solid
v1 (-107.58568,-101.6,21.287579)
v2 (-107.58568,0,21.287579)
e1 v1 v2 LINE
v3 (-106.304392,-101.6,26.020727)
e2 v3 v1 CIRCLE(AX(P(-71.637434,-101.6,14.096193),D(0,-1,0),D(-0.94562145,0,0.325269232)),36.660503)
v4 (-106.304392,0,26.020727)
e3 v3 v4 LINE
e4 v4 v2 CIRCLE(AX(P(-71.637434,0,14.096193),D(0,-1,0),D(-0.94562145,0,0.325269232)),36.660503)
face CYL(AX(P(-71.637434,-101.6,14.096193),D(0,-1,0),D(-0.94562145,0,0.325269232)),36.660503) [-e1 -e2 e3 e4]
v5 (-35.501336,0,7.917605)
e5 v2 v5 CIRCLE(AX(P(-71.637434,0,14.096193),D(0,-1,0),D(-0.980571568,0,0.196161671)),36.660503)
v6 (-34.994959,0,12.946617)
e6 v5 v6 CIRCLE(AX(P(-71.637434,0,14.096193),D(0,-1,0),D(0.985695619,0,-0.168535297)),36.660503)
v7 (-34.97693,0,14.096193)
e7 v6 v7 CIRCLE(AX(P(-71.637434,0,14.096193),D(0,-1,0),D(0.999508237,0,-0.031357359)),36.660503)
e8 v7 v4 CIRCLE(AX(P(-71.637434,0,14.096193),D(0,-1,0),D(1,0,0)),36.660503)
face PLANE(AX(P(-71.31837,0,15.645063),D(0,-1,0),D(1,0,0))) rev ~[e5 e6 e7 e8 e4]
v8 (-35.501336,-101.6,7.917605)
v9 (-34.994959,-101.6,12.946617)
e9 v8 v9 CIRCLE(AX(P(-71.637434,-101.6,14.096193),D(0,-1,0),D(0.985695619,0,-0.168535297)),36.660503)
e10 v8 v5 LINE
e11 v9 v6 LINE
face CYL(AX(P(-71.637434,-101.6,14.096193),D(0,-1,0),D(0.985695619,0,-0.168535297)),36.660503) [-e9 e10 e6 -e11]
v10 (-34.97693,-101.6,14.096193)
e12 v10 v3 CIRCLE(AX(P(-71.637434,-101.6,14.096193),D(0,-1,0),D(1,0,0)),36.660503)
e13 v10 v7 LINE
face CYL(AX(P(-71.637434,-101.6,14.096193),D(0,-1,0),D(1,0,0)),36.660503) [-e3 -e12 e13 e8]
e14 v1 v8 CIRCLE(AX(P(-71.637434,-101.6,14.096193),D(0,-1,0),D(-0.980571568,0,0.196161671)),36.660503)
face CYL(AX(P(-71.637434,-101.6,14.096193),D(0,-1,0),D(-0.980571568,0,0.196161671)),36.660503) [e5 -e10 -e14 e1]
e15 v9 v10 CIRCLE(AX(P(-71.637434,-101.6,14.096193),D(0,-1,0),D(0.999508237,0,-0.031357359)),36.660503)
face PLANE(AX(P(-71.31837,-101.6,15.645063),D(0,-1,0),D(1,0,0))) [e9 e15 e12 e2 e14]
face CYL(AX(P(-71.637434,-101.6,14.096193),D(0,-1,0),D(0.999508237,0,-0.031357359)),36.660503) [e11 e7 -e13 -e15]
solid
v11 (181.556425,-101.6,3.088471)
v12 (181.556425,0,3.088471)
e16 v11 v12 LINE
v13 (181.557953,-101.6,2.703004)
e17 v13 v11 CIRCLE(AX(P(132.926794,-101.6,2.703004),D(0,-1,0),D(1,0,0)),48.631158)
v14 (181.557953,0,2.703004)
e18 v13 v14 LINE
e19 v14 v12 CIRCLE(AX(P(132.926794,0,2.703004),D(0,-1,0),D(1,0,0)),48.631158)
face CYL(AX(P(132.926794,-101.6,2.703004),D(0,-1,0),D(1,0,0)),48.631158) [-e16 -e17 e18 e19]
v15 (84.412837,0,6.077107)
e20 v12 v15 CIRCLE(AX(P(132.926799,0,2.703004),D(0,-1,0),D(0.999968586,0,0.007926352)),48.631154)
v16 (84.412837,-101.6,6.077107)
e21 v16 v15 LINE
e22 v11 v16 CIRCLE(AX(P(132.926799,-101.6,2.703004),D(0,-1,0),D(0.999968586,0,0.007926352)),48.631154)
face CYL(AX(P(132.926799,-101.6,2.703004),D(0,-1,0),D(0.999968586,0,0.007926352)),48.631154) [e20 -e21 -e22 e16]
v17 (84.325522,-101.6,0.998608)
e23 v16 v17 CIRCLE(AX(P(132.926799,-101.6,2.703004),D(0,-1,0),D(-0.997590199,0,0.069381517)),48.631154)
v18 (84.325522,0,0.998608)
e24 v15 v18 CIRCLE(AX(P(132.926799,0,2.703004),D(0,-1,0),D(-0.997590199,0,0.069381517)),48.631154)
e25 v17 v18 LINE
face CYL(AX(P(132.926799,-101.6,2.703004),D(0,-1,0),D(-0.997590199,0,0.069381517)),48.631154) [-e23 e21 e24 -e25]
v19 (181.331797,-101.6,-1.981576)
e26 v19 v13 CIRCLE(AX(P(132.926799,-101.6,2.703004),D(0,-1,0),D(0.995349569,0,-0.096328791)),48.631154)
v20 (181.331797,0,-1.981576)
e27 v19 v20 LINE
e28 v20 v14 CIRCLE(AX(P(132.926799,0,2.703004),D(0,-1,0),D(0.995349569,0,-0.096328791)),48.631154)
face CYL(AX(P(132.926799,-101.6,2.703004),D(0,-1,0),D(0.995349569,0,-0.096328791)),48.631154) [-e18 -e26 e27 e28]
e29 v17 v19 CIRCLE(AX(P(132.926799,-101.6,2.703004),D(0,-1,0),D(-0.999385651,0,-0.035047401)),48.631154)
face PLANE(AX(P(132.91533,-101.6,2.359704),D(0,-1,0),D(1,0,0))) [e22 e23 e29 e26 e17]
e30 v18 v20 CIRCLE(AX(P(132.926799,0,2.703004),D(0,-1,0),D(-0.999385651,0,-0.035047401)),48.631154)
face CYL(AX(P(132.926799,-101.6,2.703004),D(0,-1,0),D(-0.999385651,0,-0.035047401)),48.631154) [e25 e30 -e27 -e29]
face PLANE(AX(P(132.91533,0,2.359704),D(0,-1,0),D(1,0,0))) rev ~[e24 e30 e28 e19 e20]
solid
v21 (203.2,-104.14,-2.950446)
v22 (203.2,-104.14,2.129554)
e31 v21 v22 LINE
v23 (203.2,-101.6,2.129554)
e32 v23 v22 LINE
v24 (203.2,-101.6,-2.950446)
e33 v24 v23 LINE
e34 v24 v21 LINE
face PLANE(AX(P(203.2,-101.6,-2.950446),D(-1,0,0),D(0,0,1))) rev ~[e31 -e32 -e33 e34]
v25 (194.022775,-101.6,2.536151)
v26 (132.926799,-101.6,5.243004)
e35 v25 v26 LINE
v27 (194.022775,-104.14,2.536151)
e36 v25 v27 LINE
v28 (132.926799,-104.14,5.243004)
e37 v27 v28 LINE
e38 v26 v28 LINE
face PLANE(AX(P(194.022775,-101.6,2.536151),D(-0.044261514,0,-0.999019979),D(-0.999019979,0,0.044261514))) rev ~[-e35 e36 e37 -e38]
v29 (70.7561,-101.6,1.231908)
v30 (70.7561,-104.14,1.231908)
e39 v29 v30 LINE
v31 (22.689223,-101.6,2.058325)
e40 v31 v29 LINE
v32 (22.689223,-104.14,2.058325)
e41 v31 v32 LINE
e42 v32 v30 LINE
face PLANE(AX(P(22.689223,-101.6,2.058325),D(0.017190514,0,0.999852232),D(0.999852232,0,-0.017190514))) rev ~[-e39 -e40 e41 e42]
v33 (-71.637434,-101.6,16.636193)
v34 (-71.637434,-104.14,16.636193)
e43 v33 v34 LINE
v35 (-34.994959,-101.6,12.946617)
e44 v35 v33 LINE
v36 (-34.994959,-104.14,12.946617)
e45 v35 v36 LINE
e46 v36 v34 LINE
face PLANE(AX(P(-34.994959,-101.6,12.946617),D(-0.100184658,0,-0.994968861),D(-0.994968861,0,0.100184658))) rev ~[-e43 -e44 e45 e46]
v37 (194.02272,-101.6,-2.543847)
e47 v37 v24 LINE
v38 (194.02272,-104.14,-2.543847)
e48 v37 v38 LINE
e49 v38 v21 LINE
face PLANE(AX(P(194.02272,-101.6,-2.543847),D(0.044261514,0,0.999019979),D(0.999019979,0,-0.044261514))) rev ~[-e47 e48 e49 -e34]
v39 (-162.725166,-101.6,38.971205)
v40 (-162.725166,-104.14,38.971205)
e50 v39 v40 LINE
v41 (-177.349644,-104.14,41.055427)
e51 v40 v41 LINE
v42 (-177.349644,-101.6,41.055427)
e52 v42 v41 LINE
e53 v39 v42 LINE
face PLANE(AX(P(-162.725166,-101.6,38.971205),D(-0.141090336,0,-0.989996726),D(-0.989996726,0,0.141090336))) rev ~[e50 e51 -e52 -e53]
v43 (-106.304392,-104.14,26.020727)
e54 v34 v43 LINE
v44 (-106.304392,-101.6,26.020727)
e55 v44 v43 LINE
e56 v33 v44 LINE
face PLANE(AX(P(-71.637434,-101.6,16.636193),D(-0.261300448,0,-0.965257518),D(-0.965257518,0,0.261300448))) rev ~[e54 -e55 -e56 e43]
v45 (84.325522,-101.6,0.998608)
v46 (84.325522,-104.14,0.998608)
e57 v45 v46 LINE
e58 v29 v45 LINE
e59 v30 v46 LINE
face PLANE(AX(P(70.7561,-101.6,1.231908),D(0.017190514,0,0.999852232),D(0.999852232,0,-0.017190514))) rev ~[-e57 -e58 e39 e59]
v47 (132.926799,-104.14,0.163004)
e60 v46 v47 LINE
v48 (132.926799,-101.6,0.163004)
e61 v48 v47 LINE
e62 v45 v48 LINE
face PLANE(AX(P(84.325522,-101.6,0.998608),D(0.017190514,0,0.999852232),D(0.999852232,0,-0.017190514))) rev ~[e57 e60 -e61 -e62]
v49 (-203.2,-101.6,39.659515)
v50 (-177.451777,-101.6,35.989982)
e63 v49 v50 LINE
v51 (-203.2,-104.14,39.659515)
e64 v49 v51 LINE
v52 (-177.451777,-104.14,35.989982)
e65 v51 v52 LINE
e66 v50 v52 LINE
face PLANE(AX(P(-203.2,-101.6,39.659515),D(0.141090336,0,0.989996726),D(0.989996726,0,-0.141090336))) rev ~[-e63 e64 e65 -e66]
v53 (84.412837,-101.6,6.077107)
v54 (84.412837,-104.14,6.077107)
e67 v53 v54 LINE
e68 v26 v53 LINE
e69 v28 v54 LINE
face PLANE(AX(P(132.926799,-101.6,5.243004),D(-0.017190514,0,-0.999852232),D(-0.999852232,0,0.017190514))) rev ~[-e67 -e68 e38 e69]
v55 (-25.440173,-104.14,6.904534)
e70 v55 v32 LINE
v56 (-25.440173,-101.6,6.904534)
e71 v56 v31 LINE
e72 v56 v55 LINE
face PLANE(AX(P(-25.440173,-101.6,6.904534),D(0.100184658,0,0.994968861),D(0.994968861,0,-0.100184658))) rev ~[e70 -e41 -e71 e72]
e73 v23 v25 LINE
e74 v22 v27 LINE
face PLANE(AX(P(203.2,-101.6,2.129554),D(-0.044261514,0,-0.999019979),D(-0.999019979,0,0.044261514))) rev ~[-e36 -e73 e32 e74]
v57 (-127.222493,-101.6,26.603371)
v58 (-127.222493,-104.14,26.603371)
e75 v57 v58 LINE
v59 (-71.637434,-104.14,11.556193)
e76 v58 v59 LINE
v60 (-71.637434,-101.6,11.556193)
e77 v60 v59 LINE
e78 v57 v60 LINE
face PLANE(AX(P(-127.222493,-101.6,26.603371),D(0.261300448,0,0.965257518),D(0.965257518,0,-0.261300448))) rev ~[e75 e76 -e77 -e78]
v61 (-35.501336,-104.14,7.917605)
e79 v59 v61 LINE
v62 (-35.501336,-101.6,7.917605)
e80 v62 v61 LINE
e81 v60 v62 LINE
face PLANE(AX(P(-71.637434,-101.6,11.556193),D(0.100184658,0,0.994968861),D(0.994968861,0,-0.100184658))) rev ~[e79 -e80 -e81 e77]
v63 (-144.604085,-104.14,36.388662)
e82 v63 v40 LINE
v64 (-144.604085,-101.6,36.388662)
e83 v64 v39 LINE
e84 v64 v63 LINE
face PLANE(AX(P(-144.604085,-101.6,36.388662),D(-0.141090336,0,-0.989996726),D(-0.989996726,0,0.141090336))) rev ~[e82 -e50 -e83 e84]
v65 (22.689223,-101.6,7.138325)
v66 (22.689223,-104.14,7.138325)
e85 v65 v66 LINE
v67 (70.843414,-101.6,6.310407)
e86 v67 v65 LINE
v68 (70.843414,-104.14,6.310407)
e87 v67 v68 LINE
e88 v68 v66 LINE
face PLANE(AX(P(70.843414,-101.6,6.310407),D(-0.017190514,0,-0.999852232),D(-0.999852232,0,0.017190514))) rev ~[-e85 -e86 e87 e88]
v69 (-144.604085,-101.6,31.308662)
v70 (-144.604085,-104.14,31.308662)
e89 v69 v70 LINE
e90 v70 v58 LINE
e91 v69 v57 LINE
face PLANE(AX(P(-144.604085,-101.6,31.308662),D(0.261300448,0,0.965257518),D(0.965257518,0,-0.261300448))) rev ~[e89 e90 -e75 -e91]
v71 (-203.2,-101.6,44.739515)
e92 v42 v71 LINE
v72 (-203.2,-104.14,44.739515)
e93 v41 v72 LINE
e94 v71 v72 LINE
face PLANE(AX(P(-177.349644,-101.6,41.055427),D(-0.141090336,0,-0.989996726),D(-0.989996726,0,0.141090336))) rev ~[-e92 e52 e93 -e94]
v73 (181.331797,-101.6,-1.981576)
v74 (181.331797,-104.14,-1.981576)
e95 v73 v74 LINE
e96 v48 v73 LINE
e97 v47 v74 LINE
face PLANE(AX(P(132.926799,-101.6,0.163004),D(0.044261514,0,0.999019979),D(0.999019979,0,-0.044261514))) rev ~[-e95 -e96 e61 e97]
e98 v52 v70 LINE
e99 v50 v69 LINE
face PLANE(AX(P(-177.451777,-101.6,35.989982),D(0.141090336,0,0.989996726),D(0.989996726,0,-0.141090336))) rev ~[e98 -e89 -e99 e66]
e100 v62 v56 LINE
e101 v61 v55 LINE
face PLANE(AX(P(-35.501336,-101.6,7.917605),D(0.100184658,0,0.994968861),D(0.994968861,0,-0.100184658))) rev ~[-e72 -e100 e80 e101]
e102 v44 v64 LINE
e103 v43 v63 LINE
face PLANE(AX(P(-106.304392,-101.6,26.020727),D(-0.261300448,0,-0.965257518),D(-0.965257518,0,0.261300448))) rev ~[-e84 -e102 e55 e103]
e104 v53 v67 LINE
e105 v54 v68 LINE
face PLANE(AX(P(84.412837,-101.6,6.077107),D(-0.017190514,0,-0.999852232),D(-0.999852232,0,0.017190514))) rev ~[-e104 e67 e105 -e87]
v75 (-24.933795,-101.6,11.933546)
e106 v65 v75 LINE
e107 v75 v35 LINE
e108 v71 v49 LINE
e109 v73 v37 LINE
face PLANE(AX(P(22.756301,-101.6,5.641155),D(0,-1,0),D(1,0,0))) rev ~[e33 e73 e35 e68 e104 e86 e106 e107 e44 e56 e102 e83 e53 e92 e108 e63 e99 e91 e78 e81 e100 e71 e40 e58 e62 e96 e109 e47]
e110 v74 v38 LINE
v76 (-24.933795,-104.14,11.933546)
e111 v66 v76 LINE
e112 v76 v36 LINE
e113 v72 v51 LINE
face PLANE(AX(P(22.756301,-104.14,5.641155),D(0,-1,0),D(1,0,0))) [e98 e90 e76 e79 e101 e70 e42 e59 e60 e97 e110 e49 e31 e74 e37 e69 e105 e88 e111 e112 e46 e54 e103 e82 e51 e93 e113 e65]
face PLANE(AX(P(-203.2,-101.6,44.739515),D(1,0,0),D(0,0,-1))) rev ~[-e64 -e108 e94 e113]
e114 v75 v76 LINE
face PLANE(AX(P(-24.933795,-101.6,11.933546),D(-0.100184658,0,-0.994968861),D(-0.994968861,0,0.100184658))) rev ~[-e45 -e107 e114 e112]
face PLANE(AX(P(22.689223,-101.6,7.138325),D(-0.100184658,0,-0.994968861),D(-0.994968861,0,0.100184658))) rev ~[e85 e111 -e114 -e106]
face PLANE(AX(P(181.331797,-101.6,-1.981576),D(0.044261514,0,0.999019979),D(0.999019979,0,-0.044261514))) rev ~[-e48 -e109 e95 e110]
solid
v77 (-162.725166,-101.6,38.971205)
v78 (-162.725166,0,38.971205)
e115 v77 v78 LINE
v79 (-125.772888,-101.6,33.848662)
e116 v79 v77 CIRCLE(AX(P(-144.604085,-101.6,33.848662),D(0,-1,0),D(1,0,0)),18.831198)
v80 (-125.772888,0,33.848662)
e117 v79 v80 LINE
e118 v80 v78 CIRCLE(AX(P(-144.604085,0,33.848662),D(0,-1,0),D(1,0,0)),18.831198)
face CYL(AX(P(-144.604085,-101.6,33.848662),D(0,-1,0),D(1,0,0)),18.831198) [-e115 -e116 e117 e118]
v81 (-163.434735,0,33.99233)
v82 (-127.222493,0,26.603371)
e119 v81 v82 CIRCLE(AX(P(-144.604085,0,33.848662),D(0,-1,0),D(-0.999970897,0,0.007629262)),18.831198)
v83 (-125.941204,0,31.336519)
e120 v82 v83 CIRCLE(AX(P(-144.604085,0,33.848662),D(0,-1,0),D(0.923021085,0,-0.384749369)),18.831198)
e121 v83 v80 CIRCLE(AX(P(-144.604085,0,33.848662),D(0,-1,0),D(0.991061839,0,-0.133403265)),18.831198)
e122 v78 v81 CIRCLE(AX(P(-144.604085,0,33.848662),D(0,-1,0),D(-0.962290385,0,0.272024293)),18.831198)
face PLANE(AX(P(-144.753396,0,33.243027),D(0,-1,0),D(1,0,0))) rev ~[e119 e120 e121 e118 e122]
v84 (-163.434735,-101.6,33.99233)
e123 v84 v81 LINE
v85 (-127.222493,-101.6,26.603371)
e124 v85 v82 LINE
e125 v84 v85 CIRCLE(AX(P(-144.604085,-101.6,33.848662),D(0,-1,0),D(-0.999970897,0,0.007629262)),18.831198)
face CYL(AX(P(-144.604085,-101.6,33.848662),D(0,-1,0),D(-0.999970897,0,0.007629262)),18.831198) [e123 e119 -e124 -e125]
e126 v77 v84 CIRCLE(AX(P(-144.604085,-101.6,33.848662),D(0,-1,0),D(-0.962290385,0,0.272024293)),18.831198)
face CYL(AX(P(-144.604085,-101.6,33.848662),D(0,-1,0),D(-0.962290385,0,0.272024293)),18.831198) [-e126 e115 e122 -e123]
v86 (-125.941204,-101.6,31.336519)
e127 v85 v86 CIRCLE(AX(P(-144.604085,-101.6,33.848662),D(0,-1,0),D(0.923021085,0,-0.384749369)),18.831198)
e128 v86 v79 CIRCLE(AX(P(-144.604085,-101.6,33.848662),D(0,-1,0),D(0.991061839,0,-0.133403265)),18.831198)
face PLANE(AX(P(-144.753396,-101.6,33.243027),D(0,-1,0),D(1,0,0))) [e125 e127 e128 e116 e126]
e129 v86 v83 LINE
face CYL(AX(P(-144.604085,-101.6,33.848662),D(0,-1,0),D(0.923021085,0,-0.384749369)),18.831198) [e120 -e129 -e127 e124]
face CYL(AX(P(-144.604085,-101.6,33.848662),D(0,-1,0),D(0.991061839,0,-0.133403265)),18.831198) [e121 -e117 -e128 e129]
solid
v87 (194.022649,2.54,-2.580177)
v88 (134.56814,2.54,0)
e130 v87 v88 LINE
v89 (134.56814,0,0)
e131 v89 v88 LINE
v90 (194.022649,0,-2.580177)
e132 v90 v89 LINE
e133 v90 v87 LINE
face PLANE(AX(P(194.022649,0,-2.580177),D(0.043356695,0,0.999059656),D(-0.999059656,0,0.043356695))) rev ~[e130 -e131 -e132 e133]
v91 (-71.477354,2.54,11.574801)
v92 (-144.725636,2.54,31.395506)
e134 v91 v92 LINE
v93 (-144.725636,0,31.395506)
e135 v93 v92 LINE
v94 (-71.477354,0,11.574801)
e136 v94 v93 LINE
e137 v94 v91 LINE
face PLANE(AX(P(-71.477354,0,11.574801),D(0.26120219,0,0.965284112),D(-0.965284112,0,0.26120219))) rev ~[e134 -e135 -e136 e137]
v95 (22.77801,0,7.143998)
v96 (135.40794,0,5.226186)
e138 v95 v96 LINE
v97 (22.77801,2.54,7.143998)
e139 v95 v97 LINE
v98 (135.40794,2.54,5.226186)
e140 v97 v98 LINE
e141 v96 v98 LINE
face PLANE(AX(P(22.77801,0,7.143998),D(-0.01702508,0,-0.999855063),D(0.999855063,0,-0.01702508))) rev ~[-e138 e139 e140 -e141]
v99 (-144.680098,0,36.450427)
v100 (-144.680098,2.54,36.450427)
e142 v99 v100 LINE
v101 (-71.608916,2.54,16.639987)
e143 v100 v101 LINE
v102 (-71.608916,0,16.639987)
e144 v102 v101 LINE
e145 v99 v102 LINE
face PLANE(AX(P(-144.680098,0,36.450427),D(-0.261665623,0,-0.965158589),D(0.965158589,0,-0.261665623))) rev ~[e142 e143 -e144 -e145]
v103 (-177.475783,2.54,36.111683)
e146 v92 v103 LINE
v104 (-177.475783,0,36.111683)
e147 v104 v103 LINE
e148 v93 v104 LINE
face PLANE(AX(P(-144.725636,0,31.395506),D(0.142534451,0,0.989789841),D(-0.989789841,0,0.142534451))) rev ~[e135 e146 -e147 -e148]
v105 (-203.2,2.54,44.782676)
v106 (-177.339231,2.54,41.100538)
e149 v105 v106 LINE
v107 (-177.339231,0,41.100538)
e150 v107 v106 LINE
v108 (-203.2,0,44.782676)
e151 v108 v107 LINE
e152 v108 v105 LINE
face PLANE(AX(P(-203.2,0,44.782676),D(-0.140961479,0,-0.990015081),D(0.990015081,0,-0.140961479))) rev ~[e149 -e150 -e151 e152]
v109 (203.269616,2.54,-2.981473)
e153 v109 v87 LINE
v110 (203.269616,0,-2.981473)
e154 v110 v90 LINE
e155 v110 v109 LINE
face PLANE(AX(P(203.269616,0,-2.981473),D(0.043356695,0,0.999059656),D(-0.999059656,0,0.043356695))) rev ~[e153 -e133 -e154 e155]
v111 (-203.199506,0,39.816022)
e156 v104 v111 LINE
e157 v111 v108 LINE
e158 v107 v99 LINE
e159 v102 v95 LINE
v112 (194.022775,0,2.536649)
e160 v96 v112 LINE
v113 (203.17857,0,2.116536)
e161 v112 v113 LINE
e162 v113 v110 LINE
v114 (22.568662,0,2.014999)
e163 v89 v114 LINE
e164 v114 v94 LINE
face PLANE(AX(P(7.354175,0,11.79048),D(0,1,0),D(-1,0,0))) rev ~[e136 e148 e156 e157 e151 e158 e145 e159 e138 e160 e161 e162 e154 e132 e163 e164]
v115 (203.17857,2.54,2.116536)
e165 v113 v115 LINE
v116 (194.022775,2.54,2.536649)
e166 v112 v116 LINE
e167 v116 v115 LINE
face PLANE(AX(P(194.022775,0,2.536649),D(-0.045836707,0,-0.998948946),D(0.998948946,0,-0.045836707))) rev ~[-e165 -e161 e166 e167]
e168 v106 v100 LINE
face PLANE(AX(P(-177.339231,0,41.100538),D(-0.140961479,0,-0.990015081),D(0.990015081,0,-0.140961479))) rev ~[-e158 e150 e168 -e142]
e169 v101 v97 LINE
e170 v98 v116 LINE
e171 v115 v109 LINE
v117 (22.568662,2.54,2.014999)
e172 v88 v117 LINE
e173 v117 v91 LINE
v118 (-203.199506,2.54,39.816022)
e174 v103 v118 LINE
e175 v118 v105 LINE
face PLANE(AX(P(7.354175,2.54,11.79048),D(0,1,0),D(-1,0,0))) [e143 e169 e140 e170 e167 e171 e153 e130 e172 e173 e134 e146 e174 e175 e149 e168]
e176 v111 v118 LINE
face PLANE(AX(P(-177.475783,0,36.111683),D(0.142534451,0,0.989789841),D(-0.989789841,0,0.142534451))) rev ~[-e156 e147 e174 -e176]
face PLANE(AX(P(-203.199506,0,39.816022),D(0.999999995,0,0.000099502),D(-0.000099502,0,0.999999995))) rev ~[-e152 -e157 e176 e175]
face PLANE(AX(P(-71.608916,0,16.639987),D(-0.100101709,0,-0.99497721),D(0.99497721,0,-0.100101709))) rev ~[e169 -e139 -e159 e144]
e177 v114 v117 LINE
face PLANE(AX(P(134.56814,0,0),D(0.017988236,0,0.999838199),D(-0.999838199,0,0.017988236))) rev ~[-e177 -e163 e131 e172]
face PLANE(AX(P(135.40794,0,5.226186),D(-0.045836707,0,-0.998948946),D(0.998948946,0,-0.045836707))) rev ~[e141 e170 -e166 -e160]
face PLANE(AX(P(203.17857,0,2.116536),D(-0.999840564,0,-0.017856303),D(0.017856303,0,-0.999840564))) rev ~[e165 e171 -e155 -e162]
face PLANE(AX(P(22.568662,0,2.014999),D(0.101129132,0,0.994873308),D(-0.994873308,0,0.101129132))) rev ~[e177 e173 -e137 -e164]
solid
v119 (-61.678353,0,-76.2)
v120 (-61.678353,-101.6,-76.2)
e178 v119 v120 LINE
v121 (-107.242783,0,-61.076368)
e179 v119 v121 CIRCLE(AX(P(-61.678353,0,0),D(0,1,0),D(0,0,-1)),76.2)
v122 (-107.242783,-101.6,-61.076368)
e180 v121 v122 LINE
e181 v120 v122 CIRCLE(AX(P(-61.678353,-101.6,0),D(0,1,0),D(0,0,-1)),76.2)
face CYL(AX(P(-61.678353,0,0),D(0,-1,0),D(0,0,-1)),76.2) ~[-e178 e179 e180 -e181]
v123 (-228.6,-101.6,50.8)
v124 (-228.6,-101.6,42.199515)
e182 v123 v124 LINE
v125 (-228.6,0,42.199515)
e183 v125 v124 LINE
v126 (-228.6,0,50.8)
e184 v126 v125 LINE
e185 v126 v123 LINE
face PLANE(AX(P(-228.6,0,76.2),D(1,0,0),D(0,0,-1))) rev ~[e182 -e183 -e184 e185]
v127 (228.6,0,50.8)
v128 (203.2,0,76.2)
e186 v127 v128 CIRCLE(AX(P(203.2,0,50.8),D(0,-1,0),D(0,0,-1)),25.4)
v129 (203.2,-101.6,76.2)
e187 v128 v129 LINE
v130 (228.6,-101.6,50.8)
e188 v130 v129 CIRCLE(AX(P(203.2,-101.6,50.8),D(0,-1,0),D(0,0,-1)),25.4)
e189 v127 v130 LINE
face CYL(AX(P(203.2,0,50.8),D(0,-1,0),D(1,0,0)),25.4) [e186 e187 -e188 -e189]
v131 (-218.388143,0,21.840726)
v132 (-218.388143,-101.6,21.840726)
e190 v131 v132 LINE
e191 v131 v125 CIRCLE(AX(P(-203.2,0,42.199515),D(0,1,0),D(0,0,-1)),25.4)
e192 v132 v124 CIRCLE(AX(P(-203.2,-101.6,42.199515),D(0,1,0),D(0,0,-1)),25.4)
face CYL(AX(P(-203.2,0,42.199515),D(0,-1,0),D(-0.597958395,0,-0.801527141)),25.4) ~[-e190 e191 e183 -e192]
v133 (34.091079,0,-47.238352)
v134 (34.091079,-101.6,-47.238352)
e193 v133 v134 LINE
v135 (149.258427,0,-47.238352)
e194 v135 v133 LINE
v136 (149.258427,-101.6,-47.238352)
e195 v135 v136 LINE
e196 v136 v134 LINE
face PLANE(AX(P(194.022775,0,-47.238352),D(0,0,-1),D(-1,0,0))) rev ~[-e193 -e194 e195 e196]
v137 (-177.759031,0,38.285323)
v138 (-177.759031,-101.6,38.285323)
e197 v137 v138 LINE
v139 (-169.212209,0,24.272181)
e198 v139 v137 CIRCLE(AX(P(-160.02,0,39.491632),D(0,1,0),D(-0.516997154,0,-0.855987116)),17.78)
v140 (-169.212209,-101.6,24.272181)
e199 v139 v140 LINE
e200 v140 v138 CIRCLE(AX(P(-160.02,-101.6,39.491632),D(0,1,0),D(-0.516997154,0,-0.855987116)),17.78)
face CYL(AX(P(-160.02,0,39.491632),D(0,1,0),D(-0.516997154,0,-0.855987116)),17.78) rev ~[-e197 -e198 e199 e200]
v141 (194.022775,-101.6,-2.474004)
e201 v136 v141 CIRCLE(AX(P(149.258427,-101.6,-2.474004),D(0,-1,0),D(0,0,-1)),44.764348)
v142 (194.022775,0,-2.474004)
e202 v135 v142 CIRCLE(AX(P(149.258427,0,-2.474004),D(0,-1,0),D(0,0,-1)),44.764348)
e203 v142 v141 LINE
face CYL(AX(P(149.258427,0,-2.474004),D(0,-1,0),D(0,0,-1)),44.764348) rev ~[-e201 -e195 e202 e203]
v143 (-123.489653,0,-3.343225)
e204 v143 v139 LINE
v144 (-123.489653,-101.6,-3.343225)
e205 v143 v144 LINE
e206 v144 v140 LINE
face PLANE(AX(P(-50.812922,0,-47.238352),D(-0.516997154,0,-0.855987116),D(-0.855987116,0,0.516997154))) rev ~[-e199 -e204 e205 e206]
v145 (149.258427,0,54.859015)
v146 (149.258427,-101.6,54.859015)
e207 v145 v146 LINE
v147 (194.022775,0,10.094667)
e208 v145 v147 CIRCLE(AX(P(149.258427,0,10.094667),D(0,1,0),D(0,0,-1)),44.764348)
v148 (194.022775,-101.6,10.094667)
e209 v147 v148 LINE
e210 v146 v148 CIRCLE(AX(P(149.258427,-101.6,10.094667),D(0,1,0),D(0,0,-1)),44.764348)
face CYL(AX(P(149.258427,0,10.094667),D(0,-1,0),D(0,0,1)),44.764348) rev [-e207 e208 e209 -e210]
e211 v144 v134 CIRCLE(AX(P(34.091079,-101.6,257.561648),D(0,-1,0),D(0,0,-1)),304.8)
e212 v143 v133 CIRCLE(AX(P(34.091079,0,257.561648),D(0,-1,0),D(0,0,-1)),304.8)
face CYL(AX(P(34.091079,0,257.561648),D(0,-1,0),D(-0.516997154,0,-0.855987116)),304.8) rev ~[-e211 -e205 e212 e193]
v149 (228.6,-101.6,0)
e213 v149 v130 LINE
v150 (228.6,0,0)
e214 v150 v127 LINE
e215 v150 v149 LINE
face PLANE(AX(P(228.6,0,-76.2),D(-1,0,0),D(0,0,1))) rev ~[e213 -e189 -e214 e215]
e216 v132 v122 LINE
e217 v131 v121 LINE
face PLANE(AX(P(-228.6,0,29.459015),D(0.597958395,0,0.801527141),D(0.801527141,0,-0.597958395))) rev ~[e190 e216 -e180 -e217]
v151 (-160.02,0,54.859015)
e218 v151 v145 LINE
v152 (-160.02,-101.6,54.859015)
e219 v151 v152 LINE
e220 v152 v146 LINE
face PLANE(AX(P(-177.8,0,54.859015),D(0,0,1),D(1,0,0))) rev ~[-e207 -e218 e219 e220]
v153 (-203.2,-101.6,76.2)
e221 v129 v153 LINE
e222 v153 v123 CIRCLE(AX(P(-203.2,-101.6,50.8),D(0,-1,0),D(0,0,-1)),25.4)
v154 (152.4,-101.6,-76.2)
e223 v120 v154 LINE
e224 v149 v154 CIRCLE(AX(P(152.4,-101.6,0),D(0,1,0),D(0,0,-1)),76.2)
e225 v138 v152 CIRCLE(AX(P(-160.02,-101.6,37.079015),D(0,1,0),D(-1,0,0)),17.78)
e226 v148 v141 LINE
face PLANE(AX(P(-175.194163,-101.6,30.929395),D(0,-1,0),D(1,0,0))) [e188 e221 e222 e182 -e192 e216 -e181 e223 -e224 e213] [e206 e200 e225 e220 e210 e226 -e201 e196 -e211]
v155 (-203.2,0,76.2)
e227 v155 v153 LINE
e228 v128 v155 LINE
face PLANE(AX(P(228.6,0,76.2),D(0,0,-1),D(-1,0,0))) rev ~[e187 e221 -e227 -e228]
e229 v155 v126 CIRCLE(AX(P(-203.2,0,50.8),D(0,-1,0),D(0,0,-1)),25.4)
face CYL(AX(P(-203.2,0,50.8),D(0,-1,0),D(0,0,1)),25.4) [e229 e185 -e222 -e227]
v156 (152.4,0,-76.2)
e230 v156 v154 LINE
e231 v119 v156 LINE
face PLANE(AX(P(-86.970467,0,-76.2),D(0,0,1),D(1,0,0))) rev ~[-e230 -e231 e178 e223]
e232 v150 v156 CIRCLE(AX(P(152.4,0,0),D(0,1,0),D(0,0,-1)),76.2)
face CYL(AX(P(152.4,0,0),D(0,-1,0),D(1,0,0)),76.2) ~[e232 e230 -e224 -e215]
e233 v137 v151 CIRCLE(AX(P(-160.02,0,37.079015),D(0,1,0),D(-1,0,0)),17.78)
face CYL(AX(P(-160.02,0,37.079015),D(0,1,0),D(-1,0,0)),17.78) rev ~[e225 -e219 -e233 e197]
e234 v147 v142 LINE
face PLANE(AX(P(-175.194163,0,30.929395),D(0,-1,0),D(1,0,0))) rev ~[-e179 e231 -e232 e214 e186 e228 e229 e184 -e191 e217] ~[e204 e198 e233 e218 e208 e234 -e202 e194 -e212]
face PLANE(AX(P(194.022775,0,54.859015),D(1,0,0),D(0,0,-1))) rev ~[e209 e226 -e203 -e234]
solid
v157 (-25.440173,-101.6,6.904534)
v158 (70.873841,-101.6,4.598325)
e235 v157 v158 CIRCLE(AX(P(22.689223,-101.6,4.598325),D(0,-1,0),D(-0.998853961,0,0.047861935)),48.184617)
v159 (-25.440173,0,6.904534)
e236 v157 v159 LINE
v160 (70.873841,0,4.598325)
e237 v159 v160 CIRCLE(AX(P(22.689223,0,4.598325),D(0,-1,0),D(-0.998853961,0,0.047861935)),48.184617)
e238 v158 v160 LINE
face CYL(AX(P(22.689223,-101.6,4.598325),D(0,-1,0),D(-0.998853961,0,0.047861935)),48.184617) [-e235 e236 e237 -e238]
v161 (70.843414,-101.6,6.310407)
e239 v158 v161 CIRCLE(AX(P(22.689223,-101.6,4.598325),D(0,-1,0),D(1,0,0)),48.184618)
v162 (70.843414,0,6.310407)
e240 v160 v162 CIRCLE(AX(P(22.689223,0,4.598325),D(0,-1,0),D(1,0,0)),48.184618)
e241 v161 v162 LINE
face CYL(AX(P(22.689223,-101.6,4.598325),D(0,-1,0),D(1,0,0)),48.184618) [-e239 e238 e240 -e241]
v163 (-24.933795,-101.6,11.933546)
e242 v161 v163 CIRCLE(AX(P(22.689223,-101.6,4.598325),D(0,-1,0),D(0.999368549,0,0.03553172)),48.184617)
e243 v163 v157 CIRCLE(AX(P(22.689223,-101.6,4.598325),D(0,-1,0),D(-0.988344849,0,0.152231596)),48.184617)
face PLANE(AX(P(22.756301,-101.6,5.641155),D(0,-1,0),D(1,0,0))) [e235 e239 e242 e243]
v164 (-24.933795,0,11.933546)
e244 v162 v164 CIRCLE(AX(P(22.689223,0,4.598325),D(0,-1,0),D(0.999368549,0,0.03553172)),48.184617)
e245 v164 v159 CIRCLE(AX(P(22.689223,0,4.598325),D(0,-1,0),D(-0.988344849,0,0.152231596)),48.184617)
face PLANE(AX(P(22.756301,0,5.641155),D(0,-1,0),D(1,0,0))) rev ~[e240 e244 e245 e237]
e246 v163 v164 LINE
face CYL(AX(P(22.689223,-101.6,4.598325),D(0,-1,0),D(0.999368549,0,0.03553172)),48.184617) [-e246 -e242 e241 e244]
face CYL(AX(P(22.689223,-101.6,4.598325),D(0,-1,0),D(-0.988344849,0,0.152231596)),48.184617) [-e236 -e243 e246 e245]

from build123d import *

# Parameters (mm, degrees)
F1_DEPTH    = 101.6
F2_R        = 25.4
F3_R        = 76.2
F4_R        = 25.4
F5_T1_DEPTH = 101.6
F6_R        = 44.7643478735
F7_R        = 304.8
F9_DEPTH    = 101.6
F10_DEPTH   = 2.54
F12_DEPTH   = 2.54


# Not quite as in the source:
# - a fillet or chamfer that OpenCascade refuses, or shapes differently, is made with other operations: its cross-section is extruded or revolved along the edge and cut away or added
# - a feature names something its author has since deleted; it is built from what else it names


with BuildPart() as f1:
    # F0 (on Front) → F1 (new body)
    with BuildSketch(Plane.XZ):
        Polygon((228.6, -76.2), (228.6, 76.2), (-228.6, 76.2), (-228.6, 29.4590149546), (-86.9704671455, -76.2), align=None)
        Polygon((-50.8129218496, -47.2383520842), (-177.8, 29.4590149546), (-177.8, 54.8590149546), (194.0227749825, 54.8590149546), (194.0227749825, -47.2383520842), align=None, mode=Mode.SUBTRACT)
    extrude(amount=F1_DEPTH)

    # F2
    f2_edges = [f1.edges().sort_by_distance(p)[0] for p in [
        (-228.6, -50.8, 76.2),
        (-228.6, -50.8, 29.459015),
    ]]
    fillet(f2_edges, radius=F2_R)

    # F3
    f3_edges = [f1.edges().sort_by_distance(p)[0] for p in [
        (-86.970467, -50.8, -76.2),
        (228.6, -50.8, -76.2),
    ]]
    fillet(f3_edges, radius=F3_R)

    # F4
    f4_edges = [f1.edges().sort_by_distance(p)[0] for p in [
        (228.6, -50.8, 76.2),
    ]]
    fillet(f4_edges, radius=F4_R)

    # F5: fillet of radius 17.78 on 2 edges, made by hand

    # F5_s2 → F5_t1 (join)
    with BuildSketch(Plane.XZ):
        with BuildLine():
            ThreePointArc((-169.2122093999, 24.2721806932), (-175.5049262693, 30.7540427919), (-177.8, 39.4916316146))
            Line((-177.8, 39.4916316146), (-177.8, 29.4590149546))
            Line((-177.8, 29.4590149546), (-169.2122093999, 24.2721806932))
        make_face()
        with BuildLine():
            ThreePointArc((-177.8, 37.0790149546), (-172.5923585695, 49.6513735241), (-160.02, 54.8590149546))
            Line((-160.02, 54.8590149546), (-177.8, 54.8590149546))
            Line((-177.8, 54.8590149546), (-177.8, 37.0790149546))
        make_face()
    extrude(amount=F5_T1_DEPTH)

    # F6
    f6_edges = [f1.edges().sort_by_distance(p)[0] for p in [
        (194.022775, -50.8, -47.238352),
        (194.022775, -50.8, 54.859015),
    ]]
    fillet(f6_edges, radius=F6_R)

    # F7
    f7_edges = [f1.edges().sort_by_distance(p)[0] for p in [
        (-50.812922, -50.8, -47.238352),
    ]]
    fillet(f7_edges, radius=F7_R)


with BuildPart() as f9:
    # F8 (on face) → F9 (new body)
    with BuildSketch(Plane.XZ.offset(101.6)):
        with BuildLine():
            ThreePointArc((181.5579526246, 2.7030038423), (181.5575706981, 2.8957391669), (181.5564249247, 3.0884714642))
            Line((181.5564249247, 3.0884714642), (132.9267988621, 5.2430038423))
            Line((132.9267988621, 5.2430038423), (84.4128365038, 6.0771070674))
            ThreePointArc((84.4128365038, 6.0771070674), (84.3028312187, 3.5389983943), (84.3255215946, 0.9986082775))
            Line((84.3255215946, 0.9986082775), (132.9267988621, 0.1630038423))
            Line((132.9267988621, 0.1630038423), (181.3317967881, -1.981576401))
            ThreePointArc((181.3317967881, -1.981576401), (181.5013807609, 0.3579857976), (181.5579526246, 2.7030038423))
        make_face()
        with BuildLine():
            Line((132.9267988621, 5.2430038423), (181.5564249247, 3.0884714642))
            ThreePointArc((181.5564249247, 3.0884714642), (134.4222353253, 51.3111593931), (84.4128365038, 6.0771070674))
            Line((84.4128365038, 6.0771070674), (132.9267988621, 5.2430038423))
        make_face()
        with BuildLine():
            Line((132.9267988621, 0.1630038423), (84.3255215946, 0.9986082775))
            ThreePointArc((84.3255215946, 0.9986082775), (131.4334782085, -45.9052167557), (181.3317967881, -1.981576401))
            Line((181.3317967881, -1.981576401), (132.9267988621, 0.1630038423))
        make_face()
    extrude(amount=-F9_DEPTH)


with BuildPart() as f9b:
    # F8 (on face) → F9, piece 2 (new body)
    with BuildSketch(Plane.XZ.offset(101.6)):
        with BuildLine():
            ThreePointArc((-24.933795283, 11.9335457727), (-25.2529707533, 9.4256839495), (-25.4401728054, 6.904533558))
            Line((-25.4401728054, 6.904533558), (22.6892231991, 2.0583245484))
            Line((22.6892231991, 2.0583245484), (70.7560995281, 1.231908098))
            ThreePointArc((70.7560995281, 1.231908098), (70.8443963799, 2.9140871326), (70.8738406589, 4.5983245484))
            ThreePointArc((70.8738406589, 4.5983245484), (70.866233503, 5.4545008872), (70.8434144374, 6.3104068879))
            Line((70.8434144374, 6.3104068879), (22.6892231991, 7.1383245484))
            Line((22.6892231991, 7.1383245484), (-24.933795283, 11.9335457727))
        make_face()
        with BuildLine():
            ThreePointArc((70.8434144374, 6.3104068879), (25.5133086889, 52.7001114268), (-24.933795283, 11.9335457727))
            Line((-24.933795283, 11.9335457727), (22.6892231991, 7.1383245484))
            Line((22.6892231991, 7.1383245484), (70.8434144374, 6.3104068879))
        make_face()
        with BuildLine():
            Line((22.6892231991, 2.0583245484), (-25.4401728054, 6.904533558))
            ThreePointArc((-25.4401728054, 6.904533558), (19.8527382123, -43.5027327442), (70.7560995281, 1.231908098))
            Line((70.7560995281, 1.231908098), (22.6892231991, 2.0583245484))
        make_face()
    extrude(amount=-F9_DEPTH)


with BuildPart() as f9c:
    # F8 (on face) → F9, piece 3 (new body)
    with BuildSketch(Plane.XZ.offset(101.6)):
        with BuildLine():
            Line((-71.6374335136, 16.6361934509), (-106.3043915588, 26.0207271152))
            ThreePointArc((-106.3043915588, 26.0207271152), (-107.0242596832, 23.6755993229), (-107.5856804463, 21.2875789701))
            Line((-107.5856804463, 21.2875789701), (-71.6374335136, 11.5561934509))
            Line((-71.6374335136, 11.5561934509), (-35.5013362705, 7.9176046763))
            ThreePointArc((-35.5013362705, 7.9176046763), (-35.1613745589, 10.4233735068), (-34.994958748, 12.9466168909))
            Line((-34.994958748, 12.9466168909), (-71.6374335136, 16.6361934509))
        make_face()
        with BuildLine():
            ThreePointArc((-34.9769304727, 14.0961934509), (-65.5924205947, 50.2548757005), (-106.3043915588, 26.0207271152))
            Line((-106.3043915588, 26.0207271152), (-71.6374335136, 16.6361934509))
            Line((-71.6374335136, 16.6361934509), (-34.994958748, 12.9466168909))
            ThreePointArc((-34.994958748, 12.9466168909), (-34.9814378186, 13.521334493), (-34.9769304727, 14.0961934509))
        make_face()
        with BuildLine():
            Line((-71.6374335136, 11.5561934509), (-107.5856804463, 21.2875789701))
            ThreePointArc((-107.5856804463, 21.2875789701), (-78.3230804598, -21.9495359512), (-35.5013362705, 7.9176046763))
            Line((-35.5013362705, 7.9176046763), (-71.6374335136, 11.5561934509))
        make_face()
    extrude(amount=-F9_DEPTH)


with BuildPart() as f9d:
    # F8 (on face) → F9, piece 4 (new body)
    with BuildSketch(Plane.XZ.offset(101.6)):
        with BuildLine():
            Line((-144.6040853896, 36.3886620699), (-162.7251657845, 38.9712052824))
            ThreePointArc((-162.7251657845, 38.9712052824), (-163.2469093716, 36.5055620718), (-163.4347349564, 33.9923302158))
            Line((-163.4347349564, 33.9923302158), (-144.6040853896, 31.3086620699))
            Line((-144.6040853896, 31.3086620699), (-127.2224929369, 26.6033706712))
            ThreePointArc((-127.2224929369, 26.6033706712), (-126.4271303203, 28.9280616948), (-125.9412040494, 31.3365188163))
            Line((-125.9412040494, 31.3365188163), (-144.6040853896, 36.3886620699))
        make_face()
        with BuildLine():
            ThreePointArc((-125.9412040494, 31.3365188163), (-125.8150139618, 32.5897742577), (-125.7728877738, 33.8486620699))
            ThreePointArc((-125.7728877738, 33.8486620699), (-142.0183207333, 52.501485577), (-162.7251657845, 38.9712052824))
            Line((-162.7251657845, 38.9712052824), (-144.6040853896, 36.3886620699))
            Line((-144.6040853896, 36.3886620699), (-125.9412040494, 31.3365188163))
        make_face()
        with BuildLine():
            Line((-144.6040853896, 31.3086620699), (-163.4347349564, 33.9923302158))
            ThreePointArc((-163.4347349564, 33.9923302158), (-148.3689389615, 15.3976490564), (-127.2224929369, 26.6033706712))
            Line((-127.2224929369, 26.6033706712), (-144.6040853896, 31.3086620699))
        make_face()
    extrude(amount=-F9_DEPTH)


with BuildPart() as f10:
    # F8 (on face) → F10 (new body)
    with BuildSketch(Plane.XZ.offset(101.6)):
        with BuildLine():
            ThreePointArc((-24.933795283, 11.9335457727), (-25.2529707533, 9.4256839495), (-25.4401728054, 6.904533558))
            Line((-25.4401728054, 6.904533558), (22.6892231991, 2.0583245484))
            Line((22.6892231991, 2.0583245484), (70.7560995281, 1.231908098))
            ThreePointArc((70.7560995281, 1.231908098), (70.8443963799, 2.9140871326), (70.8738406589, 4.5983245484))
            ThreePointArc((70.8738406589, 4.5983245484), (70.866233503, 5.4545008872), (70.8434144374, 6.3104068879))
            Line((70.8434144374, 6.3104068879), (22.6892231991, 7.1383245484))
            Line((22.6892231991, 7.1383245484), (-24.933795283, 11.9335457727))
        make_face()
        with BuildLine():
            ThreePointArc((-34.994958748, 12.9466168909), (-35.1613745589, 10.4233735068), (-35.5013362705, 7.9176046763))
            Line((-35.5013362705, 7.9176046763), (-25.4401728054, 6.904533558))
            ThreePointArc((-25.4401728054, 6.904533558), (-25.2529707533, 9.4256839495), (-24.933795283, 11.9335457727))
            Line((-24.933795283, 11.9335457727), (-34.994958748, 12.9466168909))
        make_face()
        with BuildLine():
            Line((-71.6374335136, 16.6361934509), (-106.3043915588, 26.0207271152))
            ThreePointArc((-106.3043915588, 26.0207271152), (-107.0242596832, 23.6755993229), (-107.5856804463, 21.2875789701))
            Line((-107.5856804463, 21.2875789701), (-71.6374335136, 11.5561934509))
            Line((-71.6374335136, 11.5561934509), (-35.5013362705, 7.9176046763))
            ThreePointArc((-35.5013362705, 7.9176046763), (-35.1613745589, 10.4233735068), (-34.994958748, 12.9466168909))
            Line((-34.994958748, 12.9466168909), (-71.6374335136, 16.6361934509))
        make_face()
        with BuildLine():
            ThreePointArc((70.8738406589, 4.5983245484), (70.8443963799, 2.9140871326), (70.7560995281, 1.231908098))
            Line((70.7560995281, 1.231908098), (84.3255215946, 0.9986082775))
            ThreePointArc((84.3255215946, 0.9986082775), (84.3028312187, 3.5389983943), (84.4128365038, 6.0771070674))
            Line((84.4128365038, 6.0771070674), (70.8434144374, 6.3104068879))
            ThreePointArc((70.8434144374, 6.3104068879), (70.866233503, 5.4545008872), (70.8738406589, 4.5983245484))
        make_face()
        with BuildLine():
            ThreePointArc((181.5579526246, 2.7030038423), (181.5575706981, 2.8957391669), (181.5564249247, 3.0884714642))
            Line((181.5564249247, 3.0884714642), (132.9267988621, 5.2430038423))
            Line((132.9267988621, 5.2430038423), (84.4128365038, 6.0771070674))
            ThreePointArc((84.4128365038, 6.0771070674), (84.3028312187, 3.5389983943), (84.3255215946, 0.9986082775))
            Line((84.3255215946, 0.9986082775), (132.9267988621, 0.1630038423))
            Line((132.9267988621, 0.1630038423), (181.3317967881, -1.981576401))
            ThreePointArc((181.3317967881, -1.981576401), (181.5013807609, 0.3579857976), (181.5579526246, 2.7030038423))
        make_face()
        with BuildLine():
            Line((194.0227749825, -2.4740042106), (194.0227749825, 2.5361506464))
            Line((194.0227749825, 2.5361506464), (181.5564249247, 3.0884714642))
            ThreePointArc((181.5564249247, 3.0884714642), (181.5575706981, 2.8957391669), (181.5579526246, 2.7030038423))
            ThreePointArc((181.5579526246, 2.7030038423), (181.5013807609, 0.3579857976), (181.3317967881, -1.981576401))
            Line((181.3317967881, -1.981576401), (194.022720497, -2.5438469397))
            ThreePointArc((194.022720497, -2.5438469397), (194.0227613611, -2.5089255858), (194.0227749825, -2.4740042106))
        make_face()
        with BuildLine():
            Line((-144.6040853896, 36.3886620699), (-162.7251657845, 38.9712052824))
            ThreePointArc((-162.7251657845, 38.9712052824), (-163.2469093716, 36.5055620718), (-163.4347349564, 33.9923302158))
            Line((-163.4347349564, 33.9923302158), (-144.6040853896, 31.3086620699))
            Line((-144.6040853896, 31.3086620699), (-127.2224929369, 26.6033706712))
            ThreePointArc((-127.2224929369, 26.6033706712), (-126.4271303203, 28.9280616948), (-125.9412040494, 31.3365188163))
            Line((-125.9412040494, 31.3365188163), (-144.6040853896, 36.3886620699))
        make_face()
        with BuildLine():
            Line((-106.3043915588, 26.0207271152), (-125.9412040494, 31.3365188163))
            ThreePointArc((-125.9412040494, 31.3365188163), (-126.4271303203, 28.9280616948), (-127.2224929369, 26.6033706712))
            Line((-127.2224929369, 26.6033706712), (-107.5856804463, 21.2875789701))
            ThreePointArc((-107.5856804463, 21.2875789701), (-107.0242596832, 23.6755993229), (-106.3043915588, 26.0207271152))
        make_face()
        with BuildLine():
            ThreePointArc((-163.4347349564, 33.9923302158), (-163.2469093716, 36.5055620718), (-162.7251657845, 38.9712052824))
            Line((-162.7251657845, 38.9712052824), (-177.3496436399, 41.0554268187))
            ThreePointArc((-177.3496436399, 41.0554268187), (-177.6089554365, 39.678446941), (-177.7590309829, 38.2853232846))
            ThreePointArc((-177.7590309829, 38.2853232846), (-177.642814272, 37.1326451513), (-177.4517771113, 35.9899824687))
            Line((-177.4517771113, 35.9899824687), (-163.4347349564, 33.9923302158))
        make_face()
        with BuildLine():
            ThreePointArc((-177.7590309829, 38.2853232846), (-177.6089554365, 39.678446941), (-177.3496436399, 41.0554268187))
            Line((-177.3496436399, 41.0554268187), (-203.2, 44.7395152341))
            Line((-203.2, 44.7395152341), (-203.2, 42.1995152341))
            Line((-203.2, 42.1995152341), (-203.2, 39.6595152341))
            Line((-203.2, 39.6595152341), (-177.4517771113, 35.9899824687))
            ThreePointArc((-177.4517771113, 35.9899824687), (-177.642814272, 37.1326451513), (-177.7590309829, 38.2853232846))
        make_face()
        with BuildLine():
            Line((203.2, 2.1295542967), (194.0227749825, 2.5361506464))
            Line((194.0227749825, 2.5361506464), (194.0227749825, -2.4740042106))
            ThreePointArc((194.0227749825, -2.4740042106), (194.0227613611, -2.5089255858), (194.022720497, -2.5438469397))
            Line((194.022720497, -2.5438469397), (203.2, -2.9504457033))
            Line((203.2, -2.9504457033), (203.2, -0.4104457033))
            Line((203.2, -0.4104457033), (203.2, 2.1295542967))
        make_face()
    extrude(amount=F10_DEPTH)


with BuildPart() as f12:
    # F11 (on face) → F12 (new body)
    with BuildSketch(Plane(origin=(0, 0, 0), x_dir=(-1, 0, 0), z_dir=(0, 1, 0))):
        with BuildLine():
            Line((-135.4079395533, 5.2261864766), (-194.0227749825, 2.5366485965))
            Line((-194.0227749825, 2.5366485965), (-194.0227749825, -2.4740042106))
            ThreePointArc((-194.0227749825, -2.4740042106), (-194.0227435045, -2.5270907724), (-194.0226490705, -2.5801772595))
            Line((-194.0226490705, -2.5801772595), (-134.5681399107, 0))
            Line((-134.5681399107, 0), (-22.5686617196, 2.0149990451))
            Line((-22.5686617196, 2.0149990451), (71.4773535728, 11.5748010576))
            Line((71.4773535728, 11.5748010576), (144.7256356478, 31.3955061138))
            Line((144.7256356478, 31.3955061138), (177.4757826865, 36.1116832716))
            ThreePointArc((177.4757826865, 36.1116832716), (177.6509360226, 37.1941340701), (177.7590309829, 38.2853232846))
            ThreePointArc((177.7590309829, 38.2853232846), (177.6055562192, 39.7013445412), (177.3392307825, 41.1005376887))
            Line((177.3392307825, 41.1005376887), (144.6800976992, 36.4504270256))
            Line((144.6800976992, 36.4504270256), (71.608915925, 16.6399870068))
            Line((71.608915925, 16.6399870068), (-22.7780099958, 7.1439980529))
            Line((-22.7780099958, 7.1439980529), (-135.4079395533, 5.2261864766))
        make_face()
        with BuildLine():
            Line((203.2, 44.7826758027), (177.3392307825, 41.1005376887))
            ThreePointArc((177.3392307825, 41.1005376887), (177.6055562192, 39.7013445412), (177.7590309829, 38.2853232846))
            ThreePointArc((177.7590309829, 38.2853232846), (177.6509360226, 37.1941340701), (177.4757826865, 36.1116832716))
            Line((177.4757826865, 36.1116832716), (203.199505806, 39.8160219193))
            Line((203.199505806, 39.8160219193), (203.2, 44.7826758027))
        make_face()
        with BuildLine():
            Line((-194.0227749825, 2.5366485965), (-203.1785696745, 2.1165355574))
            Line((-203.1785696745, 2.1165355574), (-203.2696157694, -2.9814725276))
            Line((-203.2696157694, -2.9814725276), (-194.0226490705, -2.5801772595))
            ThreePointArc((-194.0226490705, -2.5801772595), (-194.0227435045, -2.5270907724), (-194.0227749825, -2.4740042106))
            Line((-194.0227749825, -2.4740042106), (-194.0227749825, 2.5366485965))
        make_face()
    extrude(amount=F12_DEPTH)


solid = Compound([f1.part, f9.part, f9b.part, f9c.part, f9d.part, f10.part, f12.part])
